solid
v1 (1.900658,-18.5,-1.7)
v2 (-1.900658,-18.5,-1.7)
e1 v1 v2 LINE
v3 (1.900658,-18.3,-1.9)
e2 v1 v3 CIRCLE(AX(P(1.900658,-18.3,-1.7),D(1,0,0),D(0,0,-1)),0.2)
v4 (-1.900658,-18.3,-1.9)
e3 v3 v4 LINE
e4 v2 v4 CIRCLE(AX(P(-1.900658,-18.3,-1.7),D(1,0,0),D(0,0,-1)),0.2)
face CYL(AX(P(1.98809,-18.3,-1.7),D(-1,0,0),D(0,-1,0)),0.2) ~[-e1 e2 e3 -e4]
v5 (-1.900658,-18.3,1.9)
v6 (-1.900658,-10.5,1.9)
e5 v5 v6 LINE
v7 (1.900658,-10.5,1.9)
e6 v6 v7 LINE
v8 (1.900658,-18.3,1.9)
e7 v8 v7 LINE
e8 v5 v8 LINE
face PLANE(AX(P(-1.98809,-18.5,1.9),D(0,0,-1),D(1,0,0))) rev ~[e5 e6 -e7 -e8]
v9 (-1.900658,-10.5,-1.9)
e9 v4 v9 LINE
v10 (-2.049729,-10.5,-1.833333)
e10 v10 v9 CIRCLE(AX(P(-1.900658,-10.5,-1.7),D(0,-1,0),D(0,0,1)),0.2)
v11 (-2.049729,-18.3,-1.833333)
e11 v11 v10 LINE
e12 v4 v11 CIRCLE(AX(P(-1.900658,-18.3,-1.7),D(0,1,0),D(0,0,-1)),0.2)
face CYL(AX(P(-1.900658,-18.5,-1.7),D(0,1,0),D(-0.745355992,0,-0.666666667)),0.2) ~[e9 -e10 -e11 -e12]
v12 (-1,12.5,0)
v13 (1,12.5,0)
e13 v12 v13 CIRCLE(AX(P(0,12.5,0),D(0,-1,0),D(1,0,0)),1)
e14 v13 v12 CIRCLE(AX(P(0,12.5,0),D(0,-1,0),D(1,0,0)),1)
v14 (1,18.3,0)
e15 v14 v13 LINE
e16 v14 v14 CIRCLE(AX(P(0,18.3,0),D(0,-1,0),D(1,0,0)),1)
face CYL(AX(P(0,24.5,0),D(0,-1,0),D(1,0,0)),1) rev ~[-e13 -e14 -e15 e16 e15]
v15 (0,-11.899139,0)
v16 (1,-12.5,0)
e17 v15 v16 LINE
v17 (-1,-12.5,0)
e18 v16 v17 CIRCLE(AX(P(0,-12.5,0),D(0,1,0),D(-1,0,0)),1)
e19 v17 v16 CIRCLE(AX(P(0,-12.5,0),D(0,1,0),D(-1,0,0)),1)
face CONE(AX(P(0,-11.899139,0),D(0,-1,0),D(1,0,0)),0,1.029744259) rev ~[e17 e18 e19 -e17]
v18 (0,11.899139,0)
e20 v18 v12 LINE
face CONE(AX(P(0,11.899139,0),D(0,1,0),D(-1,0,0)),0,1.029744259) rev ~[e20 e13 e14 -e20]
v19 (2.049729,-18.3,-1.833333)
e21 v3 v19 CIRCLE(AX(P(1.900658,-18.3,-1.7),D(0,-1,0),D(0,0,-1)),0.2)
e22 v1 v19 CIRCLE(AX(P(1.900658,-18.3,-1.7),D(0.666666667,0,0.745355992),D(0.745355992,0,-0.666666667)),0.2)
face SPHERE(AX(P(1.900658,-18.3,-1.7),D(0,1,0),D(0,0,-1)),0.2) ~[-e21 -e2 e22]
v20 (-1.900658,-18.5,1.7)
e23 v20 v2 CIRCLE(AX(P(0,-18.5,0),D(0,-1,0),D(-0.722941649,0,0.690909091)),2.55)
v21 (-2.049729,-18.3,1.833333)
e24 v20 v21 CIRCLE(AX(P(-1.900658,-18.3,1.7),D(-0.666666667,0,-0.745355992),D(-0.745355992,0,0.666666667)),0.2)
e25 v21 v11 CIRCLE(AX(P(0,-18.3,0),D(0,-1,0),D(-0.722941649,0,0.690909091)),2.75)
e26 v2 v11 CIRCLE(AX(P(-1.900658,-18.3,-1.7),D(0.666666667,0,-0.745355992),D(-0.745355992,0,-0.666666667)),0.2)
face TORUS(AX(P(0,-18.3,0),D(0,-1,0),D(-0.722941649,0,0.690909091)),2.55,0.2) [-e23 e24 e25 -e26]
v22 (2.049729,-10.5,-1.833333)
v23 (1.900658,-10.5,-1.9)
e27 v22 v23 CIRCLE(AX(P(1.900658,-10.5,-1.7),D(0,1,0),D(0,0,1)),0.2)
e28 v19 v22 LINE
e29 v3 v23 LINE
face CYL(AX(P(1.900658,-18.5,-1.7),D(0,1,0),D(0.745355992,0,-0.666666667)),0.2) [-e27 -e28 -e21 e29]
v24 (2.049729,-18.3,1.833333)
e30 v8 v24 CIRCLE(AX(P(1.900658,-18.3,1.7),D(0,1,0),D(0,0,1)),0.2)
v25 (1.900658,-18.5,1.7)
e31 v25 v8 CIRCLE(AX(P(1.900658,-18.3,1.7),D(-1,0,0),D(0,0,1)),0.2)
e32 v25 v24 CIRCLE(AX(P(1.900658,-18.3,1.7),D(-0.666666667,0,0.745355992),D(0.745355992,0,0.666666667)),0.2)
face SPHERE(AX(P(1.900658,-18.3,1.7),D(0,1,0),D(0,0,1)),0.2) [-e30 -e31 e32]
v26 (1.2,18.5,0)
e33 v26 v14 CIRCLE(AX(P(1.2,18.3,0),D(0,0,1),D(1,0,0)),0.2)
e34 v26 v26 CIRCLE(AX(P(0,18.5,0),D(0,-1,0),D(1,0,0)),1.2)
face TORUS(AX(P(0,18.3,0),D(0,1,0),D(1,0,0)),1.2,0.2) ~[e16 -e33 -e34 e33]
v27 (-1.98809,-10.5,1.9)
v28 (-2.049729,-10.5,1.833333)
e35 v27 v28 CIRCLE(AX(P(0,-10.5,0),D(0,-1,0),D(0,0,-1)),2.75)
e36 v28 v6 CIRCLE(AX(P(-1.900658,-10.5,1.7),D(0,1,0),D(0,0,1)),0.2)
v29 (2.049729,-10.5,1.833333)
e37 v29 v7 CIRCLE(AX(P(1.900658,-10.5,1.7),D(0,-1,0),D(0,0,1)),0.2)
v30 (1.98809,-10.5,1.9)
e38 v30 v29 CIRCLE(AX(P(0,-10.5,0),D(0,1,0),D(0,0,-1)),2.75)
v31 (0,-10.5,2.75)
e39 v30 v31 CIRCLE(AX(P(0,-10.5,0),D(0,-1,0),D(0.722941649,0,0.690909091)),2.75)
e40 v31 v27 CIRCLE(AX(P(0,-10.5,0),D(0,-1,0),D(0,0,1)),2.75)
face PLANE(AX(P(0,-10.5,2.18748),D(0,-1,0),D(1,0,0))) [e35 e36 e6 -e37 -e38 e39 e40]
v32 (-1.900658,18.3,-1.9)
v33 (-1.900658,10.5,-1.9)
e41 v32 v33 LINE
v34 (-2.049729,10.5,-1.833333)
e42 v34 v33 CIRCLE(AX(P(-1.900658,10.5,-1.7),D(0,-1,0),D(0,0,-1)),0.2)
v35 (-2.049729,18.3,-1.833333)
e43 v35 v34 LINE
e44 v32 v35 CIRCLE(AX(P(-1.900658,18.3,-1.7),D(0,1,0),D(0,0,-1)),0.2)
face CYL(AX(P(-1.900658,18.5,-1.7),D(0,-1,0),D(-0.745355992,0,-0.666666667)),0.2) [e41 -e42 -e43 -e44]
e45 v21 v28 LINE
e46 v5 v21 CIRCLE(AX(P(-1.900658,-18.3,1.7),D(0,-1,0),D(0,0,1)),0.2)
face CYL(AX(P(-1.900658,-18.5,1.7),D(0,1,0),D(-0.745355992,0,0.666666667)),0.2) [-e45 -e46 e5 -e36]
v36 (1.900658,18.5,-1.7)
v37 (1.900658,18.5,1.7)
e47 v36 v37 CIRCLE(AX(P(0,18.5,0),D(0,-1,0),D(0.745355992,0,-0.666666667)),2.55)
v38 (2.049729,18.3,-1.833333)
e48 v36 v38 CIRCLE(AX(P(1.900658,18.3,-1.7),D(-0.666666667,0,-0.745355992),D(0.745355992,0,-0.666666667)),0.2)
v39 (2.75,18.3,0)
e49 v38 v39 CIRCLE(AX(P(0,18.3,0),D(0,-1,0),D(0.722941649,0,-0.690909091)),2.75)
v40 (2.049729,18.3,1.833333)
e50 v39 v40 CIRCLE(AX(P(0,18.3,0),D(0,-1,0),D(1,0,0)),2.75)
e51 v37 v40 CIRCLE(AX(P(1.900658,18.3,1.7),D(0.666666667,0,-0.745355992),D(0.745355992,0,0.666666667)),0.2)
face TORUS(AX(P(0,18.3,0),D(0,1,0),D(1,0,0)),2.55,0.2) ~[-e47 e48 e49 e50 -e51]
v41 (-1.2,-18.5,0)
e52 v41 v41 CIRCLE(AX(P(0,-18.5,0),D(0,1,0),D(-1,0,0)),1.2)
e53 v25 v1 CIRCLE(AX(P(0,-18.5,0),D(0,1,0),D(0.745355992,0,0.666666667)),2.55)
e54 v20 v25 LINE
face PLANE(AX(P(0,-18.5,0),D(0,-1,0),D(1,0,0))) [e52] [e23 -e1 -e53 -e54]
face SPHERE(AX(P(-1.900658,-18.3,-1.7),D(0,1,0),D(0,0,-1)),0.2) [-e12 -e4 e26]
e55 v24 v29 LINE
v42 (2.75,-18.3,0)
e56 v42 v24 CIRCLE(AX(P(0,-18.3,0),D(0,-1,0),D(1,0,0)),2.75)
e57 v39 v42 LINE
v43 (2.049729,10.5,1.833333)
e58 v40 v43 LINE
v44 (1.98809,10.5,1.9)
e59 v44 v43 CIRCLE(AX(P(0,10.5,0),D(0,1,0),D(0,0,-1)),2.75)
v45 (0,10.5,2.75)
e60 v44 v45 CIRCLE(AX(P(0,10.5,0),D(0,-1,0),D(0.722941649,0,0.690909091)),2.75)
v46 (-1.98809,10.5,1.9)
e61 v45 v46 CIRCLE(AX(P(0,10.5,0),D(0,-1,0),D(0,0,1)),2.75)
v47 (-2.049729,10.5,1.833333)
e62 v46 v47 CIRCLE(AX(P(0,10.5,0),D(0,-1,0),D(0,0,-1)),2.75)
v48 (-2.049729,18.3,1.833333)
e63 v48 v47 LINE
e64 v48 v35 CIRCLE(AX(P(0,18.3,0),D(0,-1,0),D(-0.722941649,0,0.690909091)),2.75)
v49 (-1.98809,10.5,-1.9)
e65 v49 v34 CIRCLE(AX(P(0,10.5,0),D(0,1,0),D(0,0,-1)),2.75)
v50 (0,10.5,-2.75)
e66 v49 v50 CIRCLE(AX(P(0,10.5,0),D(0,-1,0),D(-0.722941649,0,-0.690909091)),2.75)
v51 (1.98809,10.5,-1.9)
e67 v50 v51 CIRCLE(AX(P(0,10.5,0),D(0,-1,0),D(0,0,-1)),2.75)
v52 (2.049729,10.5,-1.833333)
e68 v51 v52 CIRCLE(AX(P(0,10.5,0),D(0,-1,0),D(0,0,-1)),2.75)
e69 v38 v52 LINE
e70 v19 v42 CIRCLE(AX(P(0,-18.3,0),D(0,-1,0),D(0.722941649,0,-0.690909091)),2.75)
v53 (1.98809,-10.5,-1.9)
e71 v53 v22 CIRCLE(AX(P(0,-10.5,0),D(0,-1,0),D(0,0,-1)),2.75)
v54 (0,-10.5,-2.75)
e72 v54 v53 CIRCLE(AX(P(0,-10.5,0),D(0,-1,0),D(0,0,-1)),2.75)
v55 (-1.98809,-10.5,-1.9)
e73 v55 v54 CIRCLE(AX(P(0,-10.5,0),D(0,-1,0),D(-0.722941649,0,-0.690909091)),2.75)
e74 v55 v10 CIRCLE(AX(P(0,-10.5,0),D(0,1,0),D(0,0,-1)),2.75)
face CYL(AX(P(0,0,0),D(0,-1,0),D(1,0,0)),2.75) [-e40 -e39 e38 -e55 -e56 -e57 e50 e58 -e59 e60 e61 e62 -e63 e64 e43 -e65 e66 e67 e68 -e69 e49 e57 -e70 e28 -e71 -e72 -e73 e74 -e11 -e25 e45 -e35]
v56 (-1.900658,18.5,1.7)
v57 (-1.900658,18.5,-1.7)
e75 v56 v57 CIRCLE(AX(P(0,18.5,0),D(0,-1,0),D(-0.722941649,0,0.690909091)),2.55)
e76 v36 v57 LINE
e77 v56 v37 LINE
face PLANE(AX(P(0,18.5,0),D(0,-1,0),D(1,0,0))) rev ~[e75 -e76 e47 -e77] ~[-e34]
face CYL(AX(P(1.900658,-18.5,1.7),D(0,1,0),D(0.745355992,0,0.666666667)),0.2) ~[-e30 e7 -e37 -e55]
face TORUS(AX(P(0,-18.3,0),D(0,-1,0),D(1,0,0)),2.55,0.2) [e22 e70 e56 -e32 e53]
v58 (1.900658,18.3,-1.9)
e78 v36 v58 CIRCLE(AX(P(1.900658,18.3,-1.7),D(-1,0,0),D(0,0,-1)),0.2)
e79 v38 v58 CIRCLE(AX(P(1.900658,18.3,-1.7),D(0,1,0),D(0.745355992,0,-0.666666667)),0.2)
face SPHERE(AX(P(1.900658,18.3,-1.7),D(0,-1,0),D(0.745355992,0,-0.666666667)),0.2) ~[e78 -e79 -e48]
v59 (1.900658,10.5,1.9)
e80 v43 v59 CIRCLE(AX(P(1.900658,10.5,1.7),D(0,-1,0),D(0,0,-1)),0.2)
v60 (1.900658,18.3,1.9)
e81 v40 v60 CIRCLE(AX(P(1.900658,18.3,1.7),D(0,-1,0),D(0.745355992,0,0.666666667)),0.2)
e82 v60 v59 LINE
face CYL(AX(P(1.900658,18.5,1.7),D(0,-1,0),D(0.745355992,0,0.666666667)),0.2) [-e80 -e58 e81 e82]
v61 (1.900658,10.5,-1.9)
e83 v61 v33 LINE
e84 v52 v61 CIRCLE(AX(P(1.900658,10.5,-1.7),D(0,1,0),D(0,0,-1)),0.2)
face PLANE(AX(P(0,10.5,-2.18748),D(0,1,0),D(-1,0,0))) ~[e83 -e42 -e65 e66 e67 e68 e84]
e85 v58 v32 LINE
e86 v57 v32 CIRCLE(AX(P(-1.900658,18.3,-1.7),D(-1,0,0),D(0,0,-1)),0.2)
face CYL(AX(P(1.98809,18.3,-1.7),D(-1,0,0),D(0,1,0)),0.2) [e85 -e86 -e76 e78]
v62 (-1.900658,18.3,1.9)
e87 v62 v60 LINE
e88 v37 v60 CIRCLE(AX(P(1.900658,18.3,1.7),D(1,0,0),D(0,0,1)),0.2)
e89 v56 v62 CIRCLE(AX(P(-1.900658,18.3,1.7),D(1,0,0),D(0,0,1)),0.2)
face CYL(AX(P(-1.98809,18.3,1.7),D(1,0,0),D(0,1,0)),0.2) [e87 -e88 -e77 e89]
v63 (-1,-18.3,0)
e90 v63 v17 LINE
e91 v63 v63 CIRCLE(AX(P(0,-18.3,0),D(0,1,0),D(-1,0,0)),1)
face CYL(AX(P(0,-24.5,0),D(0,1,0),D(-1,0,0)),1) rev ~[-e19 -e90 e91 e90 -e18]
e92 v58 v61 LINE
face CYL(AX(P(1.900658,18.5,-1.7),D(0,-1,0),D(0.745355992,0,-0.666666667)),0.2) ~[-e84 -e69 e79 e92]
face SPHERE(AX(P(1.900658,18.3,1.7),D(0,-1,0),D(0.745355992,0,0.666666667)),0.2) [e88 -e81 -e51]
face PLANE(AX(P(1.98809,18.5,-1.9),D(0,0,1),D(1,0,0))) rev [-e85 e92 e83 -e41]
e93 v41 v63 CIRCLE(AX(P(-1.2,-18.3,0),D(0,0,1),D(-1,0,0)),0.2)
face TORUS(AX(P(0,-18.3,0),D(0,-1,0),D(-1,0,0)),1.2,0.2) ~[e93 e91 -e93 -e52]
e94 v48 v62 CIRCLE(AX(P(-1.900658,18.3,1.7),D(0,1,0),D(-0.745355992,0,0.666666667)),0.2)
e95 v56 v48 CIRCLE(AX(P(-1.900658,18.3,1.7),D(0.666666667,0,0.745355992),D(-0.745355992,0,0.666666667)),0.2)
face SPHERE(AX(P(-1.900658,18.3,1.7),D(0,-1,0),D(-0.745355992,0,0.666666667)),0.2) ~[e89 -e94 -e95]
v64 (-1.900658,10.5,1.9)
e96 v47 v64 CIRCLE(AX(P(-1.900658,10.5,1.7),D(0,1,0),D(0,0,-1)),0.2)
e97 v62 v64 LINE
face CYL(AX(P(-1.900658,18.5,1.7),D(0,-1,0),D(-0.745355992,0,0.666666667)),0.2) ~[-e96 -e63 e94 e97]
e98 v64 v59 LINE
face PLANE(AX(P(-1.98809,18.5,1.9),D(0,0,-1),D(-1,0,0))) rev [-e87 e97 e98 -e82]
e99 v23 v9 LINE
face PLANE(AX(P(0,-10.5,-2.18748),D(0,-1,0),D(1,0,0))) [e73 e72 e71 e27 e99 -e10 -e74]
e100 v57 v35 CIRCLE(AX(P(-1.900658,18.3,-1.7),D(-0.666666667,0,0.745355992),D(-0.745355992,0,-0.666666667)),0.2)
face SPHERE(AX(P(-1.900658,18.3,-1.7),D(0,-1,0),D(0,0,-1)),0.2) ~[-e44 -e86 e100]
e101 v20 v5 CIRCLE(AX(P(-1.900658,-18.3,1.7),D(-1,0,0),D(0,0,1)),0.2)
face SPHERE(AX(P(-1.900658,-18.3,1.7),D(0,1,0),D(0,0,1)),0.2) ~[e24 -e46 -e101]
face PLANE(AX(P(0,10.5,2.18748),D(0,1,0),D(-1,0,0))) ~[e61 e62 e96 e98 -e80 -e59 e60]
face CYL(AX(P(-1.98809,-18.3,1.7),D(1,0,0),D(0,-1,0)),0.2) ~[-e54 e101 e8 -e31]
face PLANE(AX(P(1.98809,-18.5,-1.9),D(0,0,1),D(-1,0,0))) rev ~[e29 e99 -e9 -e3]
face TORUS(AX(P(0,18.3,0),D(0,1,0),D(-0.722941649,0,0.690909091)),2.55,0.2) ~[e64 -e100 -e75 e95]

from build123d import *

# Parameters (mm, degrees)
F0_R           = 2.75
F1_DEPTH       = 18.5
F3_DEPTH       = 8
F7_D           = 2
F7_DEPTH       = 6
F7_TIP         = 0.600860619
F7_ON_F5_D     = 2
F7_ON_F5_DEPTH = 6
F7_ON_F5_TIP   = 0.600860619
F8_R           = 0.2


with BuildPart() as f1:
    # F0 (on Front) → F1 (new body, symmetric)
    with BuildSketch(Plane.XZ):
        Circle(F0_R)
    extrude(amount=F1_DEPTH, both=True)

    # F2 (on face) → F3 (cut)
    with BuildSketch(Plane.XZ.offset(18.5)):
        with BuildLine():
            ThreePointArc((1.9880895352, 1.9), (1.0810874155, 2.5285865617), (0, 2.75))
            ThreePointArc((0, 2.75), (-1.0810874155, 2.5285865617), (-1.9880895352, 1.9))
            Line((-1.9880895352, 1.9), (1.9880895352, 1.9))
        make_face()
        with BuildLine():
            Line((1.9880895352, -1.9), (-1.9880895352, -1.9))
            ThreePointArc((-1.9880895352, -1.9), (-1.0810874155, -2.5285865617), (0, -2.75))
            ThreePointArc((0, -2.75), (1.0810874155, -2.5285865617), (1.9880895352, -1.9))
        make_face()
    extrude(amount=-F3_DEPTH, mode=Mode.SUBTRACT)

    # F4: F1 across plane


with BuildPart() as f1_1:
    add(f1.part)
    add(f1.part.mirror(Plane.XZ), mode=Mode.INTERSECT)

    # F7
    with Locations(Plane(origin=(0, 18.5, 0), x_dir=(-1, 0, 0), z_dir=(0, 1, 0))):
        with Locations((0, 0)):
            Hole(F7_D / 2, depth=F7_DEPTH)
            with Locations((0, 0, -(F7_DEPTH + F7_TIP / 2))):  # 118° drill point
                Cone(0, F7_D / 2, F7_TIP, mode=Mode.SUBTRACT)

    # F7 on F5
    with Locations(Plane.XZ.offset(18.5)):
        with Locations((0, 0)):
            Hole(F7_ON_F5_D / 2, depth=F7_ON_F5_DEPTH)
            with Locations((0, 0, -(F7_ON_F5_DEPTH + F7_ON_F5_TIP / 2))):  # 118° drill point
                Cone(0, F7_ON_F5_D / 2, F7_ON_F5_TIP, mode=Mode.SUBTRACT)

    # F8
    f8_edges = [f1_1.edges().sort_by_distance(p)[0] for p in [
        (2.552425, -18.5, 1.023536),
        (-2.75, -18.5, 0),
        (2.552425, -18.5, -1.023536),
        (-1.98809, -14.5, -1.9),
        (1.98809, -14.5, -1.9),
        (1.98809, -14.5, 1.9),
        (-1.98809, -14.5, 1.9),
        (0, -18.5, -1.9),
        (0, -18.5, 1.9),
        (1.98809, 14.5, 1.9),
        (-1.98809, 14.5, 1.9),
        (-1.98809, 14.5, -1.9),
        (1.98809, 14.5, -1.9),
        (2.552425, 18.5, -1.023536),
        (0, 18.5, -1.9),
        (2.552425, 18.5, 1.023536),
        (-2.75, 18.5, 0),
        (0, 18.5, 1.9),
        (1, 18.5, 0),
        (-1, -18.5, 0),
    ]]
    fillet(f8_edges, radius=F8_R)


solid = f1_1.part
